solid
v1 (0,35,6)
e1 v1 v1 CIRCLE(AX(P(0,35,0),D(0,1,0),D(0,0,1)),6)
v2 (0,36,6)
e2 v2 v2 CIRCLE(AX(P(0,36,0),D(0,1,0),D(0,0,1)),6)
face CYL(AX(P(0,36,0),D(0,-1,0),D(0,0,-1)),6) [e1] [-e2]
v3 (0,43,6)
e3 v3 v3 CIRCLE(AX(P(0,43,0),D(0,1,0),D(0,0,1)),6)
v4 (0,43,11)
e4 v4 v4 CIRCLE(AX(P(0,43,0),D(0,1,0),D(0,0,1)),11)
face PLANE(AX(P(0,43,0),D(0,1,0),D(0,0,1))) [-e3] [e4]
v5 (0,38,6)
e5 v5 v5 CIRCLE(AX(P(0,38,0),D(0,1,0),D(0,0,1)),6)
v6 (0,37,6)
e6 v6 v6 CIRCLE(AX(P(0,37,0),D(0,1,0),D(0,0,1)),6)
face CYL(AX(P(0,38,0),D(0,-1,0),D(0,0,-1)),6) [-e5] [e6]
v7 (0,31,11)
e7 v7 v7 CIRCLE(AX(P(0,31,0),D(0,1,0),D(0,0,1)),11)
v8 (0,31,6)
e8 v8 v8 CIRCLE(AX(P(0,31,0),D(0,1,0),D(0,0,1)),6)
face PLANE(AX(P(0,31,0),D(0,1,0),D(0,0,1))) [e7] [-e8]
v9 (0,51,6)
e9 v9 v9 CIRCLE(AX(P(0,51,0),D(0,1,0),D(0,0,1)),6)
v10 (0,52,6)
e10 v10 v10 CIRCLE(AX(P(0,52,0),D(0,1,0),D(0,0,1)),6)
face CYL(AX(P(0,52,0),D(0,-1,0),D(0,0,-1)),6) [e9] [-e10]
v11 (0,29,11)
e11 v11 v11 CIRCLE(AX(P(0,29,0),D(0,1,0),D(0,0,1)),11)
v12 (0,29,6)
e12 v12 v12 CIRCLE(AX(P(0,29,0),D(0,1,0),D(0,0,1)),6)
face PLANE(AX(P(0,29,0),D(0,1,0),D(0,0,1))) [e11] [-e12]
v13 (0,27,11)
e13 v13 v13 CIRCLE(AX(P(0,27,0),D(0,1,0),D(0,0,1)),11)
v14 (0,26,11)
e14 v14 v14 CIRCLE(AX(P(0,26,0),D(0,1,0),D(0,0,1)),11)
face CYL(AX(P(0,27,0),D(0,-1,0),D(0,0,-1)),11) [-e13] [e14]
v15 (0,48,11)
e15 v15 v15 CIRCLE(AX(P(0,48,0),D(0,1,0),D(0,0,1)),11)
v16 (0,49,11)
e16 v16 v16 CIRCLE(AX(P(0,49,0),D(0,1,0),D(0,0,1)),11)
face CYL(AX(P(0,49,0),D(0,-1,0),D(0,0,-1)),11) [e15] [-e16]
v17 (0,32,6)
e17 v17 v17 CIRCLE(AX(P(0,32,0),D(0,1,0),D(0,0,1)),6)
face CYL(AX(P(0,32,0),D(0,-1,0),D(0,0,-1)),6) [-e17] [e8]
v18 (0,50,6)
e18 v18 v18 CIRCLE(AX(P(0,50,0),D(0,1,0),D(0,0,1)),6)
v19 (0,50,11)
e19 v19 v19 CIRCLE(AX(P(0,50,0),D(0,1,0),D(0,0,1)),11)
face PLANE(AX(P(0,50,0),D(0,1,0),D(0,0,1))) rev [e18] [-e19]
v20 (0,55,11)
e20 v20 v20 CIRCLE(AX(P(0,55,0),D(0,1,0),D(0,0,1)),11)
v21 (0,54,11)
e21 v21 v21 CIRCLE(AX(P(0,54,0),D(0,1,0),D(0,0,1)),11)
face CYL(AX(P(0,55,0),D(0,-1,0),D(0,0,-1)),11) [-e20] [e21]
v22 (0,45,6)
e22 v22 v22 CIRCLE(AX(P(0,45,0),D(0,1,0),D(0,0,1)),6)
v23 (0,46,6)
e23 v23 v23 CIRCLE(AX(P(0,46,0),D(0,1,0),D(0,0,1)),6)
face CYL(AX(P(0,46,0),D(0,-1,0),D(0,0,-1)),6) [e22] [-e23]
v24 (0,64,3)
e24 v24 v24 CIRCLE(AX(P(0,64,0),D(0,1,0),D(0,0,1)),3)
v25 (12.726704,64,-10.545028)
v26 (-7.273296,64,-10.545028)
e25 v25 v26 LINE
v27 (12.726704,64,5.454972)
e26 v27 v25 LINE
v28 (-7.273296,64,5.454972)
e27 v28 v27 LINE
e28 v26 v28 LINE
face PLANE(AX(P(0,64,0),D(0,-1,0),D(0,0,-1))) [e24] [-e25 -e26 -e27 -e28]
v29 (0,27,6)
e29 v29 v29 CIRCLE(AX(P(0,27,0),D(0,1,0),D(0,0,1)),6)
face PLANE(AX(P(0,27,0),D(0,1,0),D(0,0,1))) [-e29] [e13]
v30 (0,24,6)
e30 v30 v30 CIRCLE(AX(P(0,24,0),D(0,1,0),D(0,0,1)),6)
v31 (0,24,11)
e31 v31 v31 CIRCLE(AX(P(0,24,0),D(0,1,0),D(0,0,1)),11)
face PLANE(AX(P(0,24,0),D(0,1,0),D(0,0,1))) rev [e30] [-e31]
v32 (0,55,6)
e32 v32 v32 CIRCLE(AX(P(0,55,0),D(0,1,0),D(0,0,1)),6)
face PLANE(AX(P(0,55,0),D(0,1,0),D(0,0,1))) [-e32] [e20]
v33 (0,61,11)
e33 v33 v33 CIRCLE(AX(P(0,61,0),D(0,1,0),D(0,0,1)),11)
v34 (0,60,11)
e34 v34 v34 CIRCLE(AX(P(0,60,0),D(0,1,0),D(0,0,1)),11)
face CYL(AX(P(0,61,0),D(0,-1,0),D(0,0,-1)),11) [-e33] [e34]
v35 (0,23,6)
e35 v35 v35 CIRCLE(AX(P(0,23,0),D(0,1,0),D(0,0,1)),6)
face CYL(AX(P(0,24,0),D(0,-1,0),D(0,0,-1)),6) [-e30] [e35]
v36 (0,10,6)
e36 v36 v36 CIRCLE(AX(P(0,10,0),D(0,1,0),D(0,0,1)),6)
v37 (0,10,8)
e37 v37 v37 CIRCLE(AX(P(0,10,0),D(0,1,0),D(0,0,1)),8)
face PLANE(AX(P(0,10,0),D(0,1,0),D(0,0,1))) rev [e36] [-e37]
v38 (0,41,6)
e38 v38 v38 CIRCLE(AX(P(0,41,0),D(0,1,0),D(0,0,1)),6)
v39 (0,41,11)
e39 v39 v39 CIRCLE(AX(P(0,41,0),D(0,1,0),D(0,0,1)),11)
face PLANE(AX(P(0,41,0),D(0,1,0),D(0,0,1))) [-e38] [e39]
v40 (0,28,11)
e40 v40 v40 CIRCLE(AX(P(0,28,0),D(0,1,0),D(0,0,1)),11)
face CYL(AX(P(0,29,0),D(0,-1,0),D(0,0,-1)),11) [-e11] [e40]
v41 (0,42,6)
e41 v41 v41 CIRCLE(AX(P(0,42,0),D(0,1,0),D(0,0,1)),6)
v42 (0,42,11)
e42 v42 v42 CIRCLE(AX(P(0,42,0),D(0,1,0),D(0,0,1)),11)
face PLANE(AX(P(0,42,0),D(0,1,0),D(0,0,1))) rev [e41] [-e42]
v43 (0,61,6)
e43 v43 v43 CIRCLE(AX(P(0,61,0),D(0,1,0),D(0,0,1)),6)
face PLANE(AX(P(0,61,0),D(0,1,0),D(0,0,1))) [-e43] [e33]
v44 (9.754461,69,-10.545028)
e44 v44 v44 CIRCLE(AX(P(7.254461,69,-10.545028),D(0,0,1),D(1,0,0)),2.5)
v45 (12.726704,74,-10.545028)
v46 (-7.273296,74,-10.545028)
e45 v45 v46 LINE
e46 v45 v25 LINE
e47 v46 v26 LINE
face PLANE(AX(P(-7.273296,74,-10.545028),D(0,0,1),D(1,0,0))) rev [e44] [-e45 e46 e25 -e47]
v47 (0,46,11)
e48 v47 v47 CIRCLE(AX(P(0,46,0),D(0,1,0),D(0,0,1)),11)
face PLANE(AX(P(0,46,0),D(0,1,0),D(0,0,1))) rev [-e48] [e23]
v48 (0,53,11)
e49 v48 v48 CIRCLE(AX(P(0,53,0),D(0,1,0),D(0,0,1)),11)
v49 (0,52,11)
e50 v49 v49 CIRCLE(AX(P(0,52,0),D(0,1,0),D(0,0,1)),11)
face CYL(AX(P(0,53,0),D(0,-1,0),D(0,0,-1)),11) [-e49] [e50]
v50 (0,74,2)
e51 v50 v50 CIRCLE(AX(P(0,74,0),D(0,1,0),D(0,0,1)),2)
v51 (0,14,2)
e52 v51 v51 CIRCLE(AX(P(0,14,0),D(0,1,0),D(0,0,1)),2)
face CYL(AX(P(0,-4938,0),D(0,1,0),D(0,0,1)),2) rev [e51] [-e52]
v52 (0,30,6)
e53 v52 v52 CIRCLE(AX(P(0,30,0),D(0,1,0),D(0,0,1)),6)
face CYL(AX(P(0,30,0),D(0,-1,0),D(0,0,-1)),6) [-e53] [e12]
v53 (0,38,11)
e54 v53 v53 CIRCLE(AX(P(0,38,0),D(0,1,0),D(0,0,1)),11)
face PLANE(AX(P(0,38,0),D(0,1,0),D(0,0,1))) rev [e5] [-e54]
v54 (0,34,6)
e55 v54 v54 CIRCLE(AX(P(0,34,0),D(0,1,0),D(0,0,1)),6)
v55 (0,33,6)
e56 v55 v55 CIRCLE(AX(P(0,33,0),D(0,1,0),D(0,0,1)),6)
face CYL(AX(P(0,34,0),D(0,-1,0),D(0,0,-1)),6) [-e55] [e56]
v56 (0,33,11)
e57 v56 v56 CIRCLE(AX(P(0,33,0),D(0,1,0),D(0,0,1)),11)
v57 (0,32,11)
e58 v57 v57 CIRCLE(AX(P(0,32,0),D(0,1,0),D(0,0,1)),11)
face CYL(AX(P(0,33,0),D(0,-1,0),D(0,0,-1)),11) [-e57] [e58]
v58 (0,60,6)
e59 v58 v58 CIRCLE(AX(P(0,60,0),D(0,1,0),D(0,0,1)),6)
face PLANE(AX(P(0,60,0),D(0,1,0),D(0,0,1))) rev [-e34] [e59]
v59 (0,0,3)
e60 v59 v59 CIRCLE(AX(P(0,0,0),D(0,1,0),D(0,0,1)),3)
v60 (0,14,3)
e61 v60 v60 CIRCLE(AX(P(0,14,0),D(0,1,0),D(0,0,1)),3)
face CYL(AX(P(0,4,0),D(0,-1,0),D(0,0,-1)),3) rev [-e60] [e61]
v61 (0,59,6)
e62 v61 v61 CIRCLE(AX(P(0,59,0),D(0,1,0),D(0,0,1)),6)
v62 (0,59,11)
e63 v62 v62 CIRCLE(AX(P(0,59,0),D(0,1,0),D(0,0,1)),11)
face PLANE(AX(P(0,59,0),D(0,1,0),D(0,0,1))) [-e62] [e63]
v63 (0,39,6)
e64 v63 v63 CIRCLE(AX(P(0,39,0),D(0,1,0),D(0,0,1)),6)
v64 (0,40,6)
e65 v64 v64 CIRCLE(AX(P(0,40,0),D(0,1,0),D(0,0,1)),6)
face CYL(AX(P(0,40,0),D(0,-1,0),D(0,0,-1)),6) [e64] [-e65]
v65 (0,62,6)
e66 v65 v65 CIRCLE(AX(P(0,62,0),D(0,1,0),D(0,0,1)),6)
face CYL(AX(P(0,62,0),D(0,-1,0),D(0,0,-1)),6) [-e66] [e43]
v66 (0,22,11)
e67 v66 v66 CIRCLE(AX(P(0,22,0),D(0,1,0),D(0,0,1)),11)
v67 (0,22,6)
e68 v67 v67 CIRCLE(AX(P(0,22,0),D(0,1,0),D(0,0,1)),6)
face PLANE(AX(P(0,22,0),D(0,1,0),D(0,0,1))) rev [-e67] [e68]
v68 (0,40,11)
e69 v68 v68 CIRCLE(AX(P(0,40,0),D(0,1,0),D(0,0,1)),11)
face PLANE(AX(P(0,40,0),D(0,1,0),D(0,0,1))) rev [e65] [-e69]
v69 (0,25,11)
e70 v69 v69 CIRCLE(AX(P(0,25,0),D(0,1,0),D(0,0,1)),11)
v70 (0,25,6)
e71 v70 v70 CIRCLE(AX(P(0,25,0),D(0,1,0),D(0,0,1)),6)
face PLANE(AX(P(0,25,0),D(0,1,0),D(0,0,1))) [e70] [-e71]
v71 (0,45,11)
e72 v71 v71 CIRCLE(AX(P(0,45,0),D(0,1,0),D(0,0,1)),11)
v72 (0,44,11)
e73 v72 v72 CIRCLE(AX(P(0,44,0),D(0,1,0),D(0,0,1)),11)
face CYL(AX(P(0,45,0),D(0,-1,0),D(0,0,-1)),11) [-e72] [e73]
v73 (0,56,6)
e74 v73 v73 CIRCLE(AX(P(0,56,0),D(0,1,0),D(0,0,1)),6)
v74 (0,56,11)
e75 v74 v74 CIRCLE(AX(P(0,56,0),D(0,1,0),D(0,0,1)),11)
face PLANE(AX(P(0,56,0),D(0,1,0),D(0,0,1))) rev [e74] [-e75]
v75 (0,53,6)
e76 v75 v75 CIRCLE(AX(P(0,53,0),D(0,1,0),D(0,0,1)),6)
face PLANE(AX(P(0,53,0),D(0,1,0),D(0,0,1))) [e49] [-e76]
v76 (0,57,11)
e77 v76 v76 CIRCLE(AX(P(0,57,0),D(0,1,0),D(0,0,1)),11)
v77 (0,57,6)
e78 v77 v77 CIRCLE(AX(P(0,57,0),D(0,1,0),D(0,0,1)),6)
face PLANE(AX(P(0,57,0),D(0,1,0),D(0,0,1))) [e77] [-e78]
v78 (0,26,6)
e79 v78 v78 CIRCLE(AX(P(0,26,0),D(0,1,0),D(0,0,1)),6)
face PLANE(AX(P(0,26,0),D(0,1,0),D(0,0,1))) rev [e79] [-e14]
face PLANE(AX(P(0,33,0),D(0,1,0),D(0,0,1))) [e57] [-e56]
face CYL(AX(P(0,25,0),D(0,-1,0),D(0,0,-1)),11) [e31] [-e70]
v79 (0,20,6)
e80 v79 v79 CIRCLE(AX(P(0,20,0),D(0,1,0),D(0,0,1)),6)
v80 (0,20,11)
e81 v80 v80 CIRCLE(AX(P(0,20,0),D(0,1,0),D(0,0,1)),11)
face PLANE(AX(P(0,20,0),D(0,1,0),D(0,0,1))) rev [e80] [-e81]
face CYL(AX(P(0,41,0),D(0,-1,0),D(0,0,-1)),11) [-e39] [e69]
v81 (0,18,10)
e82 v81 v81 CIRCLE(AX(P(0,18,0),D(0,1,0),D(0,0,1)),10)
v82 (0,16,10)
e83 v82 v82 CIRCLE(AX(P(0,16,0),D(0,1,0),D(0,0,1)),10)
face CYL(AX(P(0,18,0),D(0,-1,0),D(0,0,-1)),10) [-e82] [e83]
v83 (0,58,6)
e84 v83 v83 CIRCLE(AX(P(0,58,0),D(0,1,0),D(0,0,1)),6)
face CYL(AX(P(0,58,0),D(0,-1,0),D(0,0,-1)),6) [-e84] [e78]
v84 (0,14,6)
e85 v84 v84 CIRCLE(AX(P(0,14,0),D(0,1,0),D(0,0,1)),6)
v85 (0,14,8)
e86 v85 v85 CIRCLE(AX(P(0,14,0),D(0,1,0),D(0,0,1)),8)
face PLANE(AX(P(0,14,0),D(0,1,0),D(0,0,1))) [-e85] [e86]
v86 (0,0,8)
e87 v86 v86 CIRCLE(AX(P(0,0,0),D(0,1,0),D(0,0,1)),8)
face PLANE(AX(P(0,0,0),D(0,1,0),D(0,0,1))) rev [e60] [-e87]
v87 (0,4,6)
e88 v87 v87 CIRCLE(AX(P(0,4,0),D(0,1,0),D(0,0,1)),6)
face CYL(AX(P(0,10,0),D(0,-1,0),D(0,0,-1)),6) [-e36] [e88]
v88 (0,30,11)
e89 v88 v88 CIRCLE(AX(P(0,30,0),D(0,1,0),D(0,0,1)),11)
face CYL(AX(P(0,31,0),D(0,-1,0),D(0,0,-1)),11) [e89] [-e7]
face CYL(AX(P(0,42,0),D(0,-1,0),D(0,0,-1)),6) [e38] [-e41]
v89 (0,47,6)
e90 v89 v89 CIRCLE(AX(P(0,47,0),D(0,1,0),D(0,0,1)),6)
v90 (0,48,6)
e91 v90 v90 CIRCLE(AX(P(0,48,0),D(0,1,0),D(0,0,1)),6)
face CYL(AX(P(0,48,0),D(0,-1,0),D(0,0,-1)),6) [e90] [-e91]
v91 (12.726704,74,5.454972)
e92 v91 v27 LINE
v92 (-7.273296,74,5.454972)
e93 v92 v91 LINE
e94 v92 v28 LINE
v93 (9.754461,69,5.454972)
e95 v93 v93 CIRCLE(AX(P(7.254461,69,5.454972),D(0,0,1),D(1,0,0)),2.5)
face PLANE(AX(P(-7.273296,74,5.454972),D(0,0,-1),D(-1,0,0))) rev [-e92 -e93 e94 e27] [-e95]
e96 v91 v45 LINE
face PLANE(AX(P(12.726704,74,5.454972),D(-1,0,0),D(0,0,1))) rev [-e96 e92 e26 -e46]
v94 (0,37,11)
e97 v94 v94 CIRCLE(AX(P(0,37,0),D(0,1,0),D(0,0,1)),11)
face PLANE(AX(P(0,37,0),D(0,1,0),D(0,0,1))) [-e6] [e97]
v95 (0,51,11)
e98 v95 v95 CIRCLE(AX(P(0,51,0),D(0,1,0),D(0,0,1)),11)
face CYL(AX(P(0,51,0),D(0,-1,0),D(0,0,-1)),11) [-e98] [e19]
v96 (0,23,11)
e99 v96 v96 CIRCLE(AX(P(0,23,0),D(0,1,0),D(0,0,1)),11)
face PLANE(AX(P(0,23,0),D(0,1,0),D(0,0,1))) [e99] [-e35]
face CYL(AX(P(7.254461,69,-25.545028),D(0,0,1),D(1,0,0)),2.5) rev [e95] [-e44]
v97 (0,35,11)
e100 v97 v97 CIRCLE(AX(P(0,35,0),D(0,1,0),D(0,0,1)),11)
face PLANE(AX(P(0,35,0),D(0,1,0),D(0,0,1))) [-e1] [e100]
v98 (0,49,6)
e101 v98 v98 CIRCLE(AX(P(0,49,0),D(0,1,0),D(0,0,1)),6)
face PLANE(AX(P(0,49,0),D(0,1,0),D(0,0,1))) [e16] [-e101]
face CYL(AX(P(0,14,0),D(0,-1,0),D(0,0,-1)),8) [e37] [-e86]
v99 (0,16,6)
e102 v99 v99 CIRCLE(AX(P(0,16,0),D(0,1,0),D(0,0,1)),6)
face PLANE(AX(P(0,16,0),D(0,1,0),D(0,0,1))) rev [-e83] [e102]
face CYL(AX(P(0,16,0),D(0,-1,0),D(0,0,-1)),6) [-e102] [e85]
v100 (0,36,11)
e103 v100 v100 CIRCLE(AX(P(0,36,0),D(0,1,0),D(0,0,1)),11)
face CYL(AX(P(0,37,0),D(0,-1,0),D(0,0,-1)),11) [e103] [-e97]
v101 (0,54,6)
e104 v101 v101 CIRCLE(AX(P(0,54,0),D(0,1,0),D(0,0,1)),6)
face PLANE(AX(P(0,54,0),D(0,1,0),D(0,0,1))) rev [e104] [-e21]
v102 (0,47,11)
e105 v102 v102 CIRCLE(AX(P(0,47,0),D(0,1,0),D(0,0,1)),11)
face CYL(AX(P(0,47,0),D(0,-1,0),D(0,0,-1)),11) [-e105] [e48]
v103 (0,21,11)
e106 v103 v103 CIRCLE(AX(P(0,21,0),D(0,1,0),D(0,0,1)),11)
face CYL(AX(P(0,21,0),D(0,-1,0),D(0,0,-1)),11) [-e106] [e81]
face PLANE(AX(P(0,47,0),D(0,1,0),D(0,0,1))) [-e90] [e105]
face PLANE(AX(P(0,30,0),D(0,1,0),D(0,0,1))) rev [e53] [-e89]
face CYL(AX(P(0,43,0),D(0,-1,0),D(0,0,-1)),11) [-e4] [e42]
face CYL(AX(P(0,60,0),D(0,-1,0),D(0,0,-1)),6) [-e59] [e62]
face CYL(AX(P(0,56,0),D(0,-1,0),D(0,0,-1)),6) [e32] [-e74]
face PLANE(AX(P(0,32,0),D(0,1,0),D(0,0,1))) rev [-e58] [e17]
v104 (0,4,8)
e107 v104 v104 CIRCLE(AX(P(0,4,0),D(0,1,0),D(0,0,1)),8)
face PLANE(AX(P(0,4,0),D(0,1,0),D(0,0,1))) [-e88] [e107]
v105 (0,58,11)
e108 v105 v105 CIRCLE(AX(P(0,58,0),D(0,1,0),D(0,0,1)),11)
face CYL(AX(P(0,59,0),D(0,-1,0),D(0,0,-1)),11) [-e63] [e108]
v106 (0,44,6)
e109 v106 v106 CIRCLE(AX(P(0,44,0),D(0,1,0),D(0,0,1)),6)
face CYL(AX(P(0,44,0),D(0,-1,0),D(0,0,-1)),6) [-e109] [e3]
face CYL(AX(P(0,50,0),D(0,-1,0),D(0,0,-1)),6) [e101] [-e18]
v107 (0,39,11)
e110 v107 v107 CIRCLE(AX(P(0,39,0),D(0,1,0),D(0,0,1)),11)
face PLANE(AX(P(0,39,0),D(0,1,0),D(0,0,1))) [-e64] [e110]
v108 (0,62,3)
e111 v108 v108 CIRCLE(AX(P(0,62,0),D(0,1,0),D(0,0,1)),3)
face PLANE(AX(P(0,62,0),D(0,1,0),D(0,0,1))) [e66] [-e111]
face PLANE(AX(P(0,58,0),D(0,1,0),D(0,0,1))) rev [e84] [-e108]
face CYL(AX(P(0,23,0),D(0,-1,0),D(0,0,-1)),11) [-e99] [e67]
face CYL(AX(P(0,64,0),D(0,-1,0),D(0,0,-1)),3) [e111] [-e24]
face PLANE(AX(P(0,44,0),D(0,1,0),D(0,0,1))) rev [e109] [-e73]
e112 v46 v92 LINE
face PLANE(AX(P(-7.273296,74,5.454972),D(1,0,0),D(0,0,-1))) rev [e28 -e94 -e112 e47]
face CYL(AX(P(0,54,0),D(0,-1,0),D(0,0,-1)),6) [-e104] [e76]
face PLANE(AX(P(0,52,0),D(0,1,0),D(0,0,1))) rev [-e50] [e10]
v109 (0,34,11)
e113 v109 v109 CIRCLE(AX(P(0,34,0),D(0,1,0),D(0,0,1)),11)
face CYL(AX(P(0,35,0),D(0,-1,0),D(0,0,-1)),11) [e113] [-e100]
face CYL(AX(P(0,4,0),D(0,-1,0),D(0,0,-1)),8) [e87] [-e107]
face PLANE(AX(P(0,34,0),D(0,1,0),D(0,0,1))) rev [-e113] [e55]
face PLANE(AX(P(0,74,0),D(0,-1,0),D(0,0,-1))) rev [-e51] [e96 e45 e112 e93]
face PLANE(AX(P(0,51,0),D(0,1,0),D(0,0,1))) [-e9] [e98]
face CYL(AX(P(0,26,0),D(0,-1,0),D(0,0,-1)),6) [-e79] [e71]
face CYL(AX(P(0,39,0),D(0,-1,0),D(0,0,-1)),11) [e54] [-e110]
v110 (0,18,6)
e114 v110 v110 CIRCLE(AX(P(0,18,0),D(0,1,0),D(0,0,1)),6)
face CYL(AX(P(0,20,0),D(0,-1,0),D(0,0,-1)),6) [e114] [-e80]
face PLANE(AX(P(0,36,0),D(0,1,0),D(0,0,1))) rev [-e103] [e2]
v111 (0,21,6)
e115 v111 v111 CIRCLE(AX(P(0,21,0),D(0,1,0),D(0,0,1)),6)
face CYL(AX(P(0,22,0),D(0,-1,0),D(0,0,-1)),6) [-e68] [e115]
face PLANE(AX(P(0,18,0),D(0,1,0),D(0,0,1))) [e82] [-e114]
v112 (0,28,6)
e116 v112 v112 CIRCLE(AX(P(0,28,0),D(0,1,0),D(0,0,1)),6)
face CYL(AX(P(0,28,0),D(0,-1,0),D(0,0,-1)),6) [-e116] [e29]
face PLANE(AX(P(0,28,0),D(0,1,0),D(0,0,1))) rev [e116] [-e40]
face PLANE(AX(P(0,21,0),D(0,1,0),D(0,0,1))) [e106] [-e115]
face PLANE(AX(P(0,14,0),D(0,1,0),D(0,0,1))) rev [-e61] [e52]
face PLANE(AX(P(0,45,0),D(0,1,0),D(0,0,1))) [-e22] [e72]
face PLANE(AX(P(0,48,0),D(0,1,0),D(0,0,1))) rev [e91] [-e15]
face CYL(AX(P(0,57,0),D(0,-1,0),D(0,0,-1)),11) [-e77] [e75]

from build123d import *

# Parameters (mm, degrees)
SKETCH1_R            = 8
SKETCH1_R_2          = 3
BOSS_EXTRUDE1_DEPTH  = 4
SKETCH2_R            = 6
SKETCH2_R_2          = 3
BOSS_EXTRUDE2_DEPTH  = 6
SKETCH3_R            = 8
SKETCH3_R_2          = 3
BOSS_EXTRUDE3_DEPTH  = 4
SKETCH4_R            = 6
BOSS_EXTRUDE4_DEPTH  = 2
SKETCH5_R            = 10
BOSS_EXTRUDE5_DEPTH  = 2
SKETCH6_R            = 6
BOSS_EXTRUDE6_DEPTH  = 2
SKETCH7_R            = 11
BOSS_EXTRUDE7_DEPTH  = 1
SKETCH8_R            = 6
BOSS_EXTRUDE8_DEPTH  = 1
LPATTERN2_COUNT      = 22
LPATTERN2_PITCH      = 2
SKETCH9_R            = 2
CUT_EXTRUDE1_DEPTH   = 5000
SKETCH10_R           = 3
SKETCH10_R_2         = 2
BOSS_EXTRUDE9_DEPTH  = 2
SKETCH11_W           = 20
SKETCH11_H           = 16
SKETCH11_R           = 2
BOSS_EXTRUDE10_DEPTH = 10
SKETCH12_R           = 2.5
CUT_EXTRUDE2_DEPTH   = 31


# Read off the part's stored shape, not the designer's step: LPattern3
with BuildPart() as part:
    # Sketch1 → Boss-Extrude1 (new body)
    with BuildSketch(Plane(origin=(0, 0, 0), x_dir=(1, 0, 0), z_dir=(0, 1, 0))):
        with Locations(Location((0, 0, 0), (0, 0, 270))):
            Circle(SKETCH1_R)
        with Locations(Location((0, 0, 0), (0, 0, 270))):
            Circle(SKETCH1_R_2, mode=Mode.SUBTRACT)
    extrude(amount=BOSS_EXTRUDE1_DEPTH)

    # Sketch2 → Boss-Extrude2 (add)
    with BuildSketch(Plane(origin=(0, 4, 0), x_dir=(1, 0, 0), z_dir=(0, 1, 0))):
        with Locations(Location((0, 0, 0), (0, 0, 270))):
            Circle(SKETCH2_R)
        with Locations(Location((0, 0, 0), (0, 0, 270))):
            Circle(SKETCH2_R_2, mode=Mode.SUBTRACT)
    extrude(amount=BOSS_EXTRUDE2_DEPTH)

    # Sketch3 → Boss-Extrude3 (add)
    with BuildSketch(Plane(origin=(0, 10, 0), x_dir=(1, 0, 0), z_dir=(0, 1, 0))):
        with Locations(Location((0, 0, 0), (0, 0, 270))):
            Circle(SKETCH3_R)
        with Locations(Location((0, 0, 0), (0, 0, 270))):
            Circle(SKETCH3_R_2, mode=Mode.SUBTRACT)
    extrude(amount=BOSS_EXTRUDE3_DEPTH)

    # Sketch4 → Boss-Extrude4 (add)
    with BuildSketch(Plane(origin=(0, 14, 0), x_dir=(1, 0, 0), z_dir=(0, 1, 0))):
        with Locations(Location((0, 0, 0), (0, 0, 270))):
            Circle(SKETCH4_R)
    extrude(amount=BOSS_EXTRUDE4_DEPTH)

    # Sketch5 → Boss-Extrude5 (add)
    with BuildSketch(Plane(origin=(0, 16, 0), x_dir=(1, 0, 0), z_dir=(0, 1, 0))):
        with Locations(Location((0, 0, 0), (0, 0, 270))):
            Circle(SKETCH5_R)
    extrude(amount=BOSS_EXTRUDE5_DEPTH)

    # Sketch6 → Boss-Extrude6 (add)
    with BuildSketch(Plane(origin=(0, 18, 0), x_dir=(1, 0, 0), z_dir=(0, 1, 0))):
        with Locations(Location((0, 0, 0), (0, 0, 270))):
            Circle(SKETCH6_R)
    extrude(amount=BOSS_EXTRUDE6_DEPTH)

    # Sketch7 → Boss-Extrude7 (add)
    with BuildSketch(Plane(origin=(0, 20, 0), x_dir=(1, 0, 0), z_dir=(0, 1, 0))):
        with Locations(Location((0, 0, 0), (0, 0, 270))):
            Circle(SKETCH7_R)
    boss_extrude7 = extrude(amount=BOSS_EXTRUDE7_DEPTH)

    # Sketch8 → Boss-Extrude8 (add)
    with BuildSketch(Plane(origin=(0, 21, 0), x_dir=(1, 0, 0), z_dir=(0, 1, 0))):
        with Locations(Location((0, 0, 0), (0, 0, 270))):
            Circle(SKETCH8_R)
    boss_extrude8 = extrude(amount=BOSS_EXTRUDE8_DEPTH)

    # LPattern2: Boss-Extrude7, Boss-Extrude8 ×22, 20 skipped
    with Locations(*[(0, i * LPATTERN2_PITCH, 0) for i in range(1, LPATTERN2_COUNT) if i not in (2, 3, 4, 5, 6, 7, 8, 9, 10, 11, 12, 13, 14, 15, 16, 17, 18, 19, 20, 21)]):
        add(boss_extrude7)
        add(boss_extrude8)

    # LPattern3 outline → LPattern3 (revolve)
    with BuildSketch(Plane.XY):
        Polygon((11, 27), (6, 27), (6, 28), (11, 28), (11, 29), (6, 29), (6, 30), (11, 30), (11, 31), (6, 31), (6, 32), (11, 32), (11, 33), (6, 33), (6, 34), (11, 34), (11, 35), (6, 35), (6, 36), (11, 36), (11, 37), (6, 37), (6, 38), (11, 38), (11, 39), (6, 39), (6, 40), (11, 40), (11, 41), (6, 41), (6, 42), (11, 42), (11, 43), (6, 43), (6, 44), (11, 44), (11, 45), (6, 45), (6, 46), (11, 46), (11, 47), (6, 47), (6, 48), (11, 48), (11, 49), (6, 49), (6, 50), (11, 50), (11, 51), (6, 51), (6, 52), (11, 52), (11, 53), (6, 53), (6, 54), (11, 54), (11, 55), (6, 55), (6, 56), (11, 56), (11, 57), (6, 57), (6, 58), (11, 58), (11, 59), (6, 59), (6, 60), (11, 60), (11, 61), (6, 61), (6, 62), (0, 62), (0, 24), (11, 24), (11, 25), (6, 25), (6, 26), (11, 26), align=None)
    revolve(axis=Axis((0, 0, 0), (0, 1, 0)))

    # Sketch9 → Cut-Extrude1 (cut)
    with BuildSketch(Plane(origin=(0, 62, 0), x_dir=(1, 0, 0), z_dir=(0, 1, 0))):
        with Locations(Location((0, 0, 0), (0, 0, 270))):
            Circle(SKETCH9_R)
    extrude(amount=-CUT_EXTRUDE1_DEPTH, mode=Mode.SUBTRACT)

    # Sketch10 → Boss-Extrude9 (add)
    with BuildSketch(Plane(origin=(0, 62, 0), x_dir=(1, 0, 0), z_dir=(0, 1, 0))):
        with Locations(Location((0, 0, 0), (0, 0, 270))):
            Circle(SKETCH10_R)
        with Locations(Location((0, 0, 0), (0, 0, 270))):
            Circle(SKETCH10_R_2, mode=Mode.SUBTRACT)
    extrude(amount=BOSS_EXTRUDE9_DEPTH)

    # Sketch11 → Boss-Extrude10 (add)
    with BuildSketch(Plane(origin=(0, 64, 0), x_dir=(1, 0, 0), z_dir=(0, 1, 0))):
        with Locations((2.726704239, 2.545028179)):
            Rectangle(SKETCH11_W, SKETCH11_H)
        with Locations(Location((0, 0, 0), (0, 0, 270))):
            Circle(SKETCH11_R, mode=Mode.SUBTRACT)
    extrude(amount=BOSS_EXTRUDE10_DEPTH)

    # Sketch12 → Cut-Extrude2 (cut)
    with BuildSketch(Plane.XY.offset(5.454971821)):
        with Locations((7.254461047, 69)):
            Circle(SKETCH12_R)
    extrude(amount=-CUT_EXTRUDE2_DEPTH, mode=Mode.SUBTRACT)


solid = part.part
